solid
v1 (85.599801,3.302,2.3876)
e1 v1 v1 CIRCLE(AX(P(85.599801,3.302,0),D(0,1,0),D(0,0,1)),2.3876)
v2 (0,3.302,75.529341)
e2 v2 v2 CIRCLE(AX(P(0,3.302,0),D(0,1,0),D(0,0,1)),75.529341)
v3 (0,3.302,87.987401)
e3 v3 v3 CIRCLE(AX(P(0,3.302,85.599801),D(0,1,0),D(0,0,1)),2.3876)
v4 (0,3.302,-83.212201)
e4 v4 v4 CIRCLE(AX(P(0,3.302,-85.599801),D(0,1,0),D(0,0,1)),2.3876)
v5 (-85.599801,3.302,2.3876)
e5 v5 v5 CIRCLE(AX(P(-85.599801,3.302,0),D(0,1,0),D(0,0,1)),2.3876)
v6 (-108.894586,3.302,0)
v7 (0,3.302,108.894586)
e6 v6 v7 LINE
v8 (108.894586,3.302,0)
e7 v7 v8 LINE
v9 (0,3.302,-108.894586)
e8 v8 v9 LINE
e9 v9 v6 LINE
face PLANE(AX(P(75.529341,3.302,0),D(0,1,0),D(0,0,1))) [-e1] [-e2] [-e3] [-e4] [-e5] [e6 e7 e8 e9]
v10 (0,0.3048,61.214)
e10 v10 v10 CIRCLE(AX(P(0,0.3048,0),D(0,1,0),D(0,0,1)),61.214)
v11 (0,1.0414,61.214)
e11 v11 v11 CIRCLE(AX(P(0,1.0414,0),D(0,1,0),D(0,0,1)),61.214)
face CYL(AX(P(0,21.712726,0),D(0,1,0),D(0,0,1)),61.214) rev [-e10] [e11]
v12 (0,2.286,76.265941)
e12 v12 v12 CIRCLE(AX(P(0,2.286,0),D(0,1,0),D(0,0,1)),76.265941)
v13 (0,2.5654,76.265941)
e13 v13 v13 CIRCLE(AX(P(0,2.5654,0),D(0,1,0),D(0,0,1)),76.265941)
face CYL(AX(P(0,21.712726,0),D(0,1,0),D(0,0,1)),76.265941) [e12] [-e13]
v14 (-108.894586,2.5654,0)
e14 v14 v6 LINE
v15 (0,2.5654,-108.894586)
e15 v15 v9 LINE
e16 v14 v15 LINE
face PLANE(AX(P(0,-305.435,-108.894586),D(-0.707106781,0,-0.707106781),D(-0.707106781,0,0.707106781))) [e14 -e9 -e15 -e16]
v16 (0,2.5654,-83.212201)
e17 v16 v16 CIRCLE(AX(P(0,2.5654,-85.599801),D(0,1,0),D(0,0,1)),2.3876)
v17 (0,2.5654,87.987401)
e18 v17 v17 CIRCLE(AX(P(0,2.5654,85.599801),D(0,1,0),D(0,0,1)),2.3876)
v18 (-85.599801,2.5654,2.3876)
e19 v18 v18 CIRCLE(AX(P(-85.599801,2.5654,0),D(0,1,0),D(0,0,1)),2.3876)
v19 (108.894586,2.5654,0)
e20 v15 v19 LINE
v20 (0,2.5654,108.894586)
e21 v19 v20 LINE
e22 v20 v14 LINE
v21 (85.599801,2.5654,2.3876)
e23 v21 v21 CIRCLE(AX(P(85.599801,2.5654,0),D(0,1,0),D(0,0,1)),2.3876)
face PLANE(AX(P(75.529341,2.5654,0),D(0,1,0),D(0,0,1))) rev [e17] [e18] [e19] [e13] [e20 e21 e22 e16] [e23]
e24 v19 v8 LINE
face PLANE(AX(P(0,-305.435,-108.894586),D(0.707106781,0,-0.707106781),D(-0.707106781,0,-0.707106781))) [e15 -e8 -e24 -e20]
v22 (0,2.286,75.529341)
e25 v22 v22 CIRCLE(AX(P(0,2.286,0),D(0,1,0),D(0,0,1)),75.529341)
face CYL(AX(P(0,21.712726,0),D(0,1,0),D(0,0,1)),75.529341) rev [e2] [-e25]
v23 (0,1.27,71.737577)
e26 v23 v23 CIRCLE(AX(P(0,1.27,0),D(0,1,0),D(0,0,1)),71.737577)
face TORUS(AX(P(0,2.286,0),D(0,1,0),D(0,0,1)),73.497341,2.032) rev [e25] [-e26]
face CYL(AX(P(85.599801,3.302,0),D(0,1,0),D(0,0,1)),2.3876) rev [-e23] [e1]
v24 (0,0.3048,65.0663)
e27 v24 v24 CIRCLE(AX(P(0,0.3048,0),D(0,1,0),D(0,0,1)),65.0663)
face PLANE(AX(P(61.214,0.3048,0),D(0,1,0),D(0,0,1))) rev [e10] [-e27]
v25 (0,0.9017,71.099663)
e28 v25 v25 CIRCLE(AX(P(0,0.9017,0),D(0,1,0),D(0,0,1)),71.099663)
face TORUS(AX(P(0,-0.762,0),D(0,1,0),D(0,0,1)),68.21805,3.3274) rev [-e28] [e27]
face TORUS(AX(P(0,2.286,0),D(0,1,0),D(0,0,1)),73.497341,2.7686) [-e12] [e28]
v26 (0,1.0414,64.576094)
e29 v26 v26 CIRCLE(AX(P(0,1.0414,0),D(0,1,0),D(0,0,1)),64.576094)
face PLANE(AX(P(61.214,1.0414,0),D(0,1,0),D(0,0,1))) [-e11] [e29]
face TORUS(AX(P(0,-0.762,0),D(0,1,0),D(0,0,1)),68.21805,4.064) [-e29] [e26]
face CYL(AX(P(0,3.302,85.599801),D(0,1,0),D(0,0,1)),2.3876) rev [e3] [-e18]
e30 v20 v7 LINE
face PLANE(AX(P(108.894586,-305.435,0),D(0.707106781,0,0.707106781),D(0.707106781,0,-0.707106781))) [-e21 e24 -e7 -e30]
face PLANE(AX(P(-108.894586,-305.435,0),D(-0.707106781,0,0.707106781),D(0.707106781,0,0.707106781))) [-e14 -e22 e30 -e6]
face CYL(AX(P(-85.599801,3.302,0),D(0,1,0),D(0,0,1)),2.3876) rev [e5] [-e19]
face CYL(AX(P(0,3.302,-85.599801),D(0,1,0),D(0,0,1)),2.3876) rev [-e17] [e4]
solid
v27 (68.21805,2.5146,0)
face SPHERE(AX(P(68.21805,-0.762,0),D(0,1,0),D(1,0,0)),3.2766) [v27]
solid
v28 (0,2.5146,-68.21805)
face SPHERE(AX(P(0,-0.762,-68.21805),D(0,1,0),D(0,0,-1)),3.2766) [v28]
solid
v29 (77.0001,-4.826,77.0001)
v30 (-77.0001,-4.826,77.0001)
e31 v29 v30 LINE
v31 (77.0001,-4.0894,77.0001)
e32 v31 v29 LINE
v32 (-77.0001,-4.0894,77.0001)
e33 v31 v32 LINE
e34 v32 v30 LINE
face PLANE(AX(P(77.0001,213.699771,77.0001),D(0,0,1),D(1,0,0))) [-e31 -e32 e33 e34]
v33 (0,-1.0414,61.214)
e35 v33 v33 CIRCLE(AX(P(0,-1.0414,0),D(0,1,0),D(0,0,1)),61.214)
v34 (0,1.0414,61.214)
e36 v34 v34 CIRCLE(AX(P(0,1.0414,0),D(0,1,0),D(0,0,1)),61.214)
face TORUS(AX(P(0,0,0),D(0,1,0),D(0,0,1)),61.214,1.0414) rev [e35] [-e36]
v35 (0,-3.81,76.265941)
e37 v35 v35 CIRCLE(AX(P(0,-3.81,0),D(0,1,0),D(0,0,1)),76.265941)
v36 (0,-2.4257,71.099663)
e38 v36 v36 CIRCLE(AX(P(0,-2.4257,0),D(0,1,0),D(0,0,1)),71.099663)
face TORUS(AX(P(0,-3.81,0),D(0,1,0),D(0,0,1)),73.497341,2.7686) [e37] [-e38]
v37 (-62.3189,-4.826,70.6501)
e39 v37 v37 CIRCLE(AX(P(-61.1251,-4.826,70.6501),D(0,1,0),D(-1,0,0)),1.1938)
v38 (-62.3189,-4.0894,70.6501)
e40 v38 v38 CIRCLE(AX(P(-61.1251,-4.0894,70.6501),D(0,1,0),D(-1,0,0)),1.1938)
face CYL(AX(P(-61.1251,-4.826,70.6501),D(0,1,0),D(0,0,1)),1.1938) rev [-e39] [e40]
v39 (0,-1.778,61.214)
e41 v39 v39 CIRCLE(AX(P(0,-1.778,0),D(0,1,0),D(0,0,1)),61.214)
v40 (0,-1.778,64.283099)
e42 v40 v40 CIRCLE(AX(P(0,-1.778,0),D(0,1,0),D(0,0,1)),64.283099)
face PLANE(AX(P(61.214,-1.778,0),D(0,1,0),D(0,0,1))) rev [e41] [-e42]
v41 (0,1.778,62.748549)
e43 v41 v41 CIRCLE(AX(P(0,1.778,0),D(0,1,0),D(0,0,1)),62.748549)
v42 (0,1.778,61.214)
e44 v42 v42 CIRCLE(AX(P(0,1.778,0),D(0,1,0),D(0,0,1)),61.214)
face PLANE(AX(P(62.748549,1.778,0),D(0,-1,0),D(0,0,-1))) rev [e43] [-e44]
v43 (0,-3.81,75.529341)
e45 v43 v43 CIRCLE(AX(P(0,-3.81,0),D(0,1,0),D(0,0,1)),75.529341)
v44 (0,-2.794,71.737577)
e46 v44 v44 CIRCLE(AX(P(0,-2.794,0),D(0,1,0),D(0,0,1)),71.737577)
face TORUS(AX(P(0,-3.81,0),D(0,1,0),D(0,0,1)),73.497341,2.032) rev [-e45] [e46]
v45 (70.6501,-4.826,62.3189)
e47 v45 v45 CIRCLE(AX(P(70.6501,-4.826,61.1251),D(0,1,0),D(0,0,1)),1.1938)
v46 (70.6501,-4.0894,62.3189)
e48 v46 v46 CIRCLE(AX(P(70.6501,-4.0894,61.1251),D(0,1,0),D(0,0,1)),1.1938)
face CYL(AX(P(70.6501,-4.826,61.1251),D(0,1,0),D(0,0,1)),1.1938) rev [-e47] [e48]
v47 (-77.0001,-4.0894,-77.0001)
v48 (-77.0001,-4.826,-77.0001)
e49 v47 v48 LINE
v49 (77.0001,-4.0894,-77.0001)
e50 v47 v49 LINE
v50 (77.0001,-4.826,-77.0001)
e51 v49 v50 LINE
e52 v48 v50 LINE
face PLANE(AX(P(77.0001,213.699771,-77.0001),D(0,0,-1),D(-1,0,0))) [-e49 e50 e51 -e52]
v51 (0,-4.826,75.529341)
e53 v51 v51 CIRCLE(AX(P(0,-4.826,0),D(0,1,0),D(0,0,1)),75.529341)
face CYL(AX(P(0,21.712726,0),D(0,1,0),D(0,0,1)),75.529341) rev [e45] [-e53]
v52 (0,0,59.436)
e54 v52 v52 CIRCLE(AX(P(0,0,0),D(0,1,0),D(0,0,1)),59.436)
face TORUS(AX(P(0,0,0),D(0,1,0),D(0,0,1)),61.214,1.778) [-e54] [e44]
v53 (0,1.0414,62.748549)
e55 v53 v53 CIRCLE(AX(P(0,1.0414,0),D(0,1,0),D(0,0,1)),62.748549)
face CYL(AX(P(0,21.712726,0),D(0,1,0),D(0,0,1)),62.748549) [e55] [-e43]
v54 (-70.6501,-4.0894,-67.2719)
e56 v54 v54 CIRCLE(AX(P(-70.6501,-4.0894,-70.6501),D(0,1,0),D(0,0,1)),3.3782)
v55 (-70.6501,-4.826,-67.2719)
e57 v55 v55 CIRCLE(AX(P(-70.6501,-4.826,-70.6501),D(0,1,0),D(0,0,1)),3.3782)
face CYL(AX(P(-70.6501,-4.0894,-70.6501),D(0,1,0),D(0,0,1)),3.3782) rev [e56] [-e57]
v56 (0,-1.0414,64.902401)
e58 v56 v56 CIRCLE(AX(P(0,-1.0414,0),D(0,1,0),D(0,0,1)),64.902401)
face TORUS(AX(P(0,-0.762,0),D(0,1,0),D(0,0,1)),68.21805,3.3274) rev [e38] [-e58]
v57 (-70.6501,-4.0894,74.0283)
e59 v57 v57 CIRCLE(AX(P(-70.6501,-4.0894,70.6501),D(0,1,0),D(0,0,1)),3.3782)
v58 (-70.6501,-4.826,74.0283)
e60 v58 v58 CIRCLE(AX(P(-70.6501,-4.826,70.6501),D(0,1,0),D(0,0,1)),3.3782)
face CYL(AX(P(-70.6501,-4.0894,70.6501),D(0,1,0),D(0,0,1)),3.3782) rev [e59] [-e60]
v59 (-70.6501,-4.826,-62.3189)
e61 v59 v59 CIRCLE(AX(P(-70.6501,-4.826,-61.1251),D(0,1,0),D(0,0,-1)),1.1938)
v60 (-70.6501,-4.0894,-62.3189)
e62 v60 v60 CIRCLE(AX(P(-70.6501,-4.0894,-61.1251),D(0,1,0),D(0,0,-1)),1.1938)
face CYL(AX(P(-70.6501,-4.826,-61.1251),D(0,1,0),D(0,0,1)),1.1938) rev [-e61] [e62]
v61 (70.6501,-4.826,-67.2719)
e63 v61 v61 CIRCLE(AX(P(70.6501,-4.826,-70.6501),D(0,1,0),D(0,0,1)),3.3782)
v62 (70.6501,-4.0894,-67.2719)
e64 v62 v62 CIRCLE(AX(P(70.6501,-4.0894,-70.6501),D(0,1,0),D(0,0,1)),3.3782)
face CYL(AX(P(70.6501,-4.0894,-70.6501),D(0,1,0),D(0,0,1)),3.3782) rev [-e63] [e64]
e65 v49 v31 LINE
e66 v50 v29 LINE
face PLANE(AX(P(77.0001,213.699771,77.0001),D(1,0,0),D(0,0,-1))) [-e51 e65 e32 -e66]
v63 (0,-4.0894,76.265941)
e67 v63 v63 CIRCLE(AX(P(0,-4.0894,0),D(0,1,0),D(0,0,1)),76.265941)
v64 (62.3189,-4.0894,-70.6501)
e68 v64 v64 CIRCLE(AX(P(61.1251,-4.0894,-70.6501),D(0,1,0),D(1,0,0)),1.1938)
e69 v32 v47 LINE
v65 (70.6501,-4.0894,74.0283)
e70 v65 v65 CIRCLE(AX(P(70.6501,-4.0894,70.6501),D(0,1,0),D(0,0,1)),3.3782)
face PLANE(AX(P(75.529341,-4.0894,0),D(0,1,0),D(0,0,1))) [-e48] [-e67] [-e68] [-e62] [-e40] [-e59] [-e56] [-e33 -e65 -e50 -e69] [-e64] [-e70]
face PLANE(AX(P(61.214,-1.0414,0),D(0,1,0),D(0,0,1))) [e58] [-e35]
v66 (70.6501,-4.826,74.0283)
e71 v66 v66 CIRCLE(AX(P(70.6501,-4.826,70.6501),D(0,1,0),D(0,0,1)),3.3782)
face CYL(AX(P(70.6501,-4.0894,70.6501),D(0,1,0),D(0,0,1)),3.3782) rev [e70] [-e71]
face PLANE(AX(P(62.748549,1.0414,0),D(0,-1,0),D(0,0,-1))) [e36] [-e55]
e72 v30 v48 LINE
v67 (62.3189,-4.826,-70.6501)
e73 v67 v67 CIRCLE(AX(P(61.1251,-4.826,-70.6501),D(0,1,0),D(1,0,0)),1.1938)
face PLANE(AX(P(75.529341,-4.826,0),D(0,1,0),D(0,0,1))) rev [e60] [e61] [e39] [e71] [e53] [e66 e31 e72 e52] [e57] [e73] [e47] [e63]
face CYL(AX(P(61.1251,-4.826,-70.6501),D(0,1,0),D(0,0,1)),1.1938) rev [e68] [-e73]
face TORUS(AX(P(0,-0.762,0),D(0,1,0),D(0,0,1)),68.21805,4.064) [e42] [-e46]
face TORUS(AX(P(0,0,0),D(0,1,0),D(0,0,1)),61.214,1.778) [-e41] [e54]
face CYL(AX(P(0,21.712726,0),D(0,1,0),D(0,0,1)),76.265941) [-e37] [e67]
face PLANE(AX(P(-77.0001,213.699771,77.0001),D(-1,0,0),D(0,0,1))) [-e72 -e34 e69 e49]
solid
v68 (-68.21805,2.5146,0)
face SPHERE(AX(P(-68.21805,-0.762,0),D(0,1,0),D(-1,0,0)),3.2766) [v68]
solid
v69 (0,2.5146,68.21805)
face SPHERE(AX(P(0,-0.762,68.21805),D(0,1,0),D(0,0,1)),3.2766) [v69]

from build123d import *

# Parameters (mm, degrees)
SKETCH2_W                                 = 154.0002
SKETCH2_H                                 = 154.0002
SKETCH2_R                                 = 75.529340861
EXTRUDE1_DEPTH                            = 0.7366
EXTRUDE2_START                            = -0.7366
SKETCH3_R                                 = 75.529340861
EXTRUDE2_DEPTH                            = 0.7366
CIRPATTERN1_COUNT                         = 4
SKETCH5_W                                 = 3.3782
SKETCH5_H                                 = 0.7366
F_5_32_0_156250_DIAMETER_HOLE1_AT_2_COUNT = 2
F_5_32_0_156250_DIAMETER_HOLE1_AT_2_PITCH = 141.3002
F_5_32_0_156250_DIAMETER_HOLE1_AT_3_COUNT = 2
F_5_32_0_156250_DIAMETER_HOLE1_AT_3_PITCH = 141.3002
F_5_32_0_156250_DIAMETER_HOLE1_AT_4_COUNT = 2
F_5_32_0_156250_DIAMETER_HOLE1_AT_4_PITCH = 199.828659206
SKETCH7_W                                 = 2.3876
SKETCH7_H                                 = 8.128
F_5_32_0_156250_DIAMETER_HOLE2_AT_2_COUNT = 2
F_5_32_0_156250_DIAMETER_HOLE2_AT_2_PITCH = 121.0564
F_5_32_0_156250_DIAMETER_HOLE2_AT_3_COUNT = 2
F_5_32_0_156250_DIAMETER_HOLE2_AT_3_PITCH = 171.199602692
F_5_32_0_156250_DIAMETER_HOLE2_AT_4_COUNT = 2
F_5_32_0_156250_DIAMETER_HOLE2_AT_4_PITCH = 121.0564
SKETCH9_R                                 = 1.1938
CUT_EXTRUDE1_DEPTH                        = 155.17747694
CIRPATTERN2_COUNT                         = 4


# Read off the part's stored shape, not the designer's step: Revolve-Thin5
with BuildPart() as part:
    # Sketch1 → Revolve-Thin4 (revolve)
    with BuildSketch(Plane.XY, mode=Mode.PRIVATE) as revolve_thin4_sk:
        with BuildLine():
            Line((62.74854946, 1.778), (61.214, 1.778))
            ThreePointArc((61.214, 1.778), (59.436, 0), (61.214, -1.778))
            Line((61.214, -1.778), (64.28309892, -1.778))
            ThreePointArc((64.28309892, -1.778), (67.669225582, -4.788771381), (71.737577241, -2.794))
            ThreePointArc((71.737577241, -2.794), (74.023261161, -1.847238721), (75.529340861, -3.81))
            Line((75.529340861, -3.81), (75.529340861, -4.826))
            Line((75.529340861, -4.826), (77.0001, -4.826))
            Line((77.0001, -4.826), (77.0001, -4.0894))
            Line((77.0001, -4.0894), (76.265940861, -4.0894))
            Line((76.265940861, -4.0894), (76.265940861, -3.81))
            ThreePointArc((76.265940861, -3.81), (74.21390727, -1.135737757), (71.099662929, -2.4257))
            ThreePointArc((71.099662929, -2.4257), (67.492675346, -4.00937161), (64.902401285, -1.0414))
            Line((64.902401285, -1.0414), (61.214, -1.0414))
            ThreePointArc((61.214, -1.0414), (60.1726, 0), (61.214, 1.0414))
            Line((61.214, 1.0414), (62.74854946, 1.0414))
            Line((62.74854946, 1.0414), (62.74854946, 1.778))
        make_face()
    revolve(revolve_thin4_sk.sketch.rotate(Axis((0, 21.71272626, 0), (0, -1, 0)), 90), axis=Axis((0, 21.71272626, 0), (0, -1, 0)))

    # Sketch2 → Extrude1 (add)
    with BuildSketch(Plane.XZ.offset(4.826)):
        Rectangle(SKETCH2_W, SKETCH2_H)
        with Locations(Location((0, 0, 0), (0, 0, 90))):
            Circle(SKETCH2_R, mode=Mode.SUBTRACT)
    extrude(amount=-EXTRUDE1_DEPTH)

    # Sketch5 → 5/32 (0.156250) Diameter Hole1 (revolve, cut)
    with BuildSketch(Plane(origin=(70.6501, -4.0894, -70.6501), x_dir=(0, 0, 1), z_dir=(1, 0, 0))):
        with Locations((1.6891, 0.3683)):
            Rectangle(SKETCH5_W, SKETCH5_H)
    f_5_32_0_156250_diameter_hole1 = revolve(axis=Axis((70.6501, 2.2606, -70.6501), (0, -1, 0)), mode=Mode.SUBTRACT)

    # 5/32 (0.156250) Diameter Hole1 at 2: 5/32 (0.156250) Diameter Hole1 ×2
    with Locations(*[(0, 0, i * F_5_32_0_156250_DIAMETER_HOLE1_AT_2_PITCH) for i in range(1, F_5_32_0_156250_DIAMETER_HOLE1_AT_2_COUNT)]):
        add(f_5_32_0_156250_diameter_hole1, mode=Mode.SUBTRACT)

    # 5/32 (0.156250) Diameter Hole1 at 3: 5/32 (0.156250) Diameter Hole1 ×2
    with Locations(*[(-i * F_5_32_0_156250_DIAMETER_HOLE1_AT_3_PITCH, 0, 0) for i in range(1, F_5_32_0_156250_DIAMETER_HOLE1_AT_3_COUNT)]):
        add(f_5_32_0_156250_diameter_hole1, mode=Mode.SUBTRACT)

    # 5/32 (0.156250) Diameter Hole1 at 4: 5/32 (0.156250) Diameter Hole1 ×2
    with Locations(*[Vector(-0.7071067811865476, 0, 0.7071067811865476) * (i * F_5_32_0_156250_DIAMETER_HOLE1_AT_4_PITCH) for i in range(1, F_5_32_0_156250_DIAMETER_HOLE1_AT_4_COUNT)]):
        add(f_5_32_0_156250_diameter_hole1, mode=Mode.SUBTRACT)

    # Sketch9 → Cut-Extrude1 (cut, through all)
    with BuildSketch(Plane(origin=(0, -4.0894, 0), x_dir=(-1, 0, 0), z_dir=(0, 1, 0))):
        with Locations(Location((-70.6501, 61.1251, 0), (0, 0, 90))):
            Circle(SKETCH9_R)
    cut_extrude1 = extrude(amount=-CUT_EXTRUDE1_DEPTH, mode=Mode.SUBTRACT)

    # CirPattern2: Cut-Extrude1 ×4 about axis
    cirpattern2_axis = Axis((0, 0, 0), (0, 1, 0))
    for i in range(1, CIRPATTERN2_COUNT):
        add(cut_extrude1.rotate(cirpattern2_axis, i * 360 / CIRPATTERN2_COUNT), mode=Mode.SUBTRACT)


with BuildPart() as body_2:
    # Revolve-Thin5 outline → Revolve-Thin5 (revolve)
    with BuildSketch(Plane.XY):
        with BuildLine():
            Line((77.0001, 3.302), (75.529340861, 3.302))
            Line((75.529340861, 3.302), (75.529340861, 2.286))
            ThreePointArc((75.529340861, 2.286), (74.023261161, 0.323238721), (71.737577241, 1.27))
            ThreePointArc((71.737577241, 1.27), (68.088390068, 3.299931105), (64.576093872, 1.0414))
            Line((64.576093872, 1.0414), (61.214, 1.0414))
            Line((61.214, 1.0414), (61.214, 0.3048))
            Line((61.214, 0.3048), (65.066299927, 0.3048))
            ThreePointArc((65.066299927, 0.3048), (67.890458911, 2.54923464), (71.099662929, 0.9017))
            ThreePointArc((71.099662929, 0.9017), (74.21390727, -0.388262243), (76.265940861, 2.286))
            Line((76.265940861, 2.286), (76.265940861, 2.5654))
            Line((76.265940861, 2.5654), (77.0001, 2.5654))
            Line((77.0001, 2.5654), (77.0001, 3.302))
        make_face()
    revolve(axis=Axis((0, 0, 0), (0, 1, 0)))

    # Sketch3 → Extrude2 (add)
    with BuildSketch(Plane(origin=(0, 3.302, 0), x_dir=(-1, 0, 0), z_dir=(0, 1, 0)).offset(EXTRUDE2_START)):
        Polygon((0, -108.894585724), (108.894585724, 0), (0, 108.894585724), (-108.894585724, 0), align=None)
        with Locations(Location((0, 0, 0), (0, 0, 90))):
            Circle(SKETCH3_R, mode=Mode.SUBTRACT)
    extrude(amount=EXTRUDE2_DEPTH)

    # Sketch7 → 5/32 (0.156250) Diameter Hole2 (revolve, cut)
    with BuildSketch(Plane(origin=(85.599801346, 3.302, 0), x_dir=(0, 0, 1), z_dir=(1, 0, 0))):
        with Locations((1.1938, 4.064)):
            Rectangle(SKETCH7_W, SKETCH7_H)
    f_5_32_0_156250_diameter_hole2 = revolve(axis=Axis((85.599801346, 9.652, 0), (0, -1, 0)), mode=Mode.SUBTRACT)

    # 5/32 (0.156250) Diameter Hole2 at 2: 5/32 (0.156250) Diameter Hole2 ×2
    with Locations(*[Vector(-0.7071067811865476, 0, -0.7071067811865476) * (i * F_5_32_0_156250_DIAMETER_HOLE2_AT_2_PITCH) for i in range(1, F_5_32_0_156250_DIAMETER_HOLE2_AT_2_COUNT)]):
        add(f_5_32_0_156250_diameter_hole2, mode=Mode.SUBTRACT)

    # 5/32 (0.156250) Diameter Hole2 at 3: 5/32 (0.156250) Diameter Hole2 ×2
    with Locations(*[(-i * F_5_32_0_156250_DIAMETER_HOLE2_AT_3_PITCH, 0, 0) for i in range(1, F_5_32_0_156250_DIAMETER_HOLE2_AT_3_COUNT)]):
        add(f_5_32_0_156250_diameter_hole2, mode=Mode.SUBTRACT)

    # 5/32 (0.156250) Diameter Hole2 at 4: 5/32 (0.156250) Diameter Hole2 ×2
    with Locations(*[Vector(-0.7071067811865476, 0, 0.7071067811865476) * (i * F_5_32_0_156250_DIAMETER_HOLE2_AT_4_PITCH) for i in range(1, F_5_32_0_156250_DIAMETER_HOLE2_AT_4_COUNT)]):
        add(f_5_32_0_156250_diameter_hole2, mode=Mode.SUBTRACT)


with BuildPart() as body_3:
    # Sketch4 → Revolve1 (revolve)
    with BuildSketch(Plane.XY):
        with BuildLine():
            Line((68.21805, 2.5146), (68.21805, -4.0386))
            ThreePointArc((68.21805, -4.0386), (71.49465, -0.762), (68.21805, 2.5146))
        make_face()
    revolve(axis=Axis((68.21805, 2.837450101, 0), (0, -1, 0)))


with BuildPart() as cirpattern1_1:
    # CirPattern1: pattern copy
    add(body_3.part.rotate(Axis((0, 0, 0), (0, 1, 0)), 1 * 360 / CIRPATTERN1_COUNT))


with BuildPart() as cirpattern1_2:
    # CirPattern1: pattern copy
    add(body_3.part.rotate(Axis((0, 0, 0), (0, 1, 0)), 2 * 360 / CIRPATTERN1_COUNT))


with BuildPart() as cirpattern1_3:
    # CirPattern1: pattern copy
    add(body_3.part.rotate(Axis((0, 0, 0), (0, 1, 0)), 3 * 360 / CIRPATTERN1_COUNT))


solid = Compound([part.part, body_2.part, body_3.part, cirpattern1_1.part, cirpattern1_2.part, cirpattern1_3.part])
